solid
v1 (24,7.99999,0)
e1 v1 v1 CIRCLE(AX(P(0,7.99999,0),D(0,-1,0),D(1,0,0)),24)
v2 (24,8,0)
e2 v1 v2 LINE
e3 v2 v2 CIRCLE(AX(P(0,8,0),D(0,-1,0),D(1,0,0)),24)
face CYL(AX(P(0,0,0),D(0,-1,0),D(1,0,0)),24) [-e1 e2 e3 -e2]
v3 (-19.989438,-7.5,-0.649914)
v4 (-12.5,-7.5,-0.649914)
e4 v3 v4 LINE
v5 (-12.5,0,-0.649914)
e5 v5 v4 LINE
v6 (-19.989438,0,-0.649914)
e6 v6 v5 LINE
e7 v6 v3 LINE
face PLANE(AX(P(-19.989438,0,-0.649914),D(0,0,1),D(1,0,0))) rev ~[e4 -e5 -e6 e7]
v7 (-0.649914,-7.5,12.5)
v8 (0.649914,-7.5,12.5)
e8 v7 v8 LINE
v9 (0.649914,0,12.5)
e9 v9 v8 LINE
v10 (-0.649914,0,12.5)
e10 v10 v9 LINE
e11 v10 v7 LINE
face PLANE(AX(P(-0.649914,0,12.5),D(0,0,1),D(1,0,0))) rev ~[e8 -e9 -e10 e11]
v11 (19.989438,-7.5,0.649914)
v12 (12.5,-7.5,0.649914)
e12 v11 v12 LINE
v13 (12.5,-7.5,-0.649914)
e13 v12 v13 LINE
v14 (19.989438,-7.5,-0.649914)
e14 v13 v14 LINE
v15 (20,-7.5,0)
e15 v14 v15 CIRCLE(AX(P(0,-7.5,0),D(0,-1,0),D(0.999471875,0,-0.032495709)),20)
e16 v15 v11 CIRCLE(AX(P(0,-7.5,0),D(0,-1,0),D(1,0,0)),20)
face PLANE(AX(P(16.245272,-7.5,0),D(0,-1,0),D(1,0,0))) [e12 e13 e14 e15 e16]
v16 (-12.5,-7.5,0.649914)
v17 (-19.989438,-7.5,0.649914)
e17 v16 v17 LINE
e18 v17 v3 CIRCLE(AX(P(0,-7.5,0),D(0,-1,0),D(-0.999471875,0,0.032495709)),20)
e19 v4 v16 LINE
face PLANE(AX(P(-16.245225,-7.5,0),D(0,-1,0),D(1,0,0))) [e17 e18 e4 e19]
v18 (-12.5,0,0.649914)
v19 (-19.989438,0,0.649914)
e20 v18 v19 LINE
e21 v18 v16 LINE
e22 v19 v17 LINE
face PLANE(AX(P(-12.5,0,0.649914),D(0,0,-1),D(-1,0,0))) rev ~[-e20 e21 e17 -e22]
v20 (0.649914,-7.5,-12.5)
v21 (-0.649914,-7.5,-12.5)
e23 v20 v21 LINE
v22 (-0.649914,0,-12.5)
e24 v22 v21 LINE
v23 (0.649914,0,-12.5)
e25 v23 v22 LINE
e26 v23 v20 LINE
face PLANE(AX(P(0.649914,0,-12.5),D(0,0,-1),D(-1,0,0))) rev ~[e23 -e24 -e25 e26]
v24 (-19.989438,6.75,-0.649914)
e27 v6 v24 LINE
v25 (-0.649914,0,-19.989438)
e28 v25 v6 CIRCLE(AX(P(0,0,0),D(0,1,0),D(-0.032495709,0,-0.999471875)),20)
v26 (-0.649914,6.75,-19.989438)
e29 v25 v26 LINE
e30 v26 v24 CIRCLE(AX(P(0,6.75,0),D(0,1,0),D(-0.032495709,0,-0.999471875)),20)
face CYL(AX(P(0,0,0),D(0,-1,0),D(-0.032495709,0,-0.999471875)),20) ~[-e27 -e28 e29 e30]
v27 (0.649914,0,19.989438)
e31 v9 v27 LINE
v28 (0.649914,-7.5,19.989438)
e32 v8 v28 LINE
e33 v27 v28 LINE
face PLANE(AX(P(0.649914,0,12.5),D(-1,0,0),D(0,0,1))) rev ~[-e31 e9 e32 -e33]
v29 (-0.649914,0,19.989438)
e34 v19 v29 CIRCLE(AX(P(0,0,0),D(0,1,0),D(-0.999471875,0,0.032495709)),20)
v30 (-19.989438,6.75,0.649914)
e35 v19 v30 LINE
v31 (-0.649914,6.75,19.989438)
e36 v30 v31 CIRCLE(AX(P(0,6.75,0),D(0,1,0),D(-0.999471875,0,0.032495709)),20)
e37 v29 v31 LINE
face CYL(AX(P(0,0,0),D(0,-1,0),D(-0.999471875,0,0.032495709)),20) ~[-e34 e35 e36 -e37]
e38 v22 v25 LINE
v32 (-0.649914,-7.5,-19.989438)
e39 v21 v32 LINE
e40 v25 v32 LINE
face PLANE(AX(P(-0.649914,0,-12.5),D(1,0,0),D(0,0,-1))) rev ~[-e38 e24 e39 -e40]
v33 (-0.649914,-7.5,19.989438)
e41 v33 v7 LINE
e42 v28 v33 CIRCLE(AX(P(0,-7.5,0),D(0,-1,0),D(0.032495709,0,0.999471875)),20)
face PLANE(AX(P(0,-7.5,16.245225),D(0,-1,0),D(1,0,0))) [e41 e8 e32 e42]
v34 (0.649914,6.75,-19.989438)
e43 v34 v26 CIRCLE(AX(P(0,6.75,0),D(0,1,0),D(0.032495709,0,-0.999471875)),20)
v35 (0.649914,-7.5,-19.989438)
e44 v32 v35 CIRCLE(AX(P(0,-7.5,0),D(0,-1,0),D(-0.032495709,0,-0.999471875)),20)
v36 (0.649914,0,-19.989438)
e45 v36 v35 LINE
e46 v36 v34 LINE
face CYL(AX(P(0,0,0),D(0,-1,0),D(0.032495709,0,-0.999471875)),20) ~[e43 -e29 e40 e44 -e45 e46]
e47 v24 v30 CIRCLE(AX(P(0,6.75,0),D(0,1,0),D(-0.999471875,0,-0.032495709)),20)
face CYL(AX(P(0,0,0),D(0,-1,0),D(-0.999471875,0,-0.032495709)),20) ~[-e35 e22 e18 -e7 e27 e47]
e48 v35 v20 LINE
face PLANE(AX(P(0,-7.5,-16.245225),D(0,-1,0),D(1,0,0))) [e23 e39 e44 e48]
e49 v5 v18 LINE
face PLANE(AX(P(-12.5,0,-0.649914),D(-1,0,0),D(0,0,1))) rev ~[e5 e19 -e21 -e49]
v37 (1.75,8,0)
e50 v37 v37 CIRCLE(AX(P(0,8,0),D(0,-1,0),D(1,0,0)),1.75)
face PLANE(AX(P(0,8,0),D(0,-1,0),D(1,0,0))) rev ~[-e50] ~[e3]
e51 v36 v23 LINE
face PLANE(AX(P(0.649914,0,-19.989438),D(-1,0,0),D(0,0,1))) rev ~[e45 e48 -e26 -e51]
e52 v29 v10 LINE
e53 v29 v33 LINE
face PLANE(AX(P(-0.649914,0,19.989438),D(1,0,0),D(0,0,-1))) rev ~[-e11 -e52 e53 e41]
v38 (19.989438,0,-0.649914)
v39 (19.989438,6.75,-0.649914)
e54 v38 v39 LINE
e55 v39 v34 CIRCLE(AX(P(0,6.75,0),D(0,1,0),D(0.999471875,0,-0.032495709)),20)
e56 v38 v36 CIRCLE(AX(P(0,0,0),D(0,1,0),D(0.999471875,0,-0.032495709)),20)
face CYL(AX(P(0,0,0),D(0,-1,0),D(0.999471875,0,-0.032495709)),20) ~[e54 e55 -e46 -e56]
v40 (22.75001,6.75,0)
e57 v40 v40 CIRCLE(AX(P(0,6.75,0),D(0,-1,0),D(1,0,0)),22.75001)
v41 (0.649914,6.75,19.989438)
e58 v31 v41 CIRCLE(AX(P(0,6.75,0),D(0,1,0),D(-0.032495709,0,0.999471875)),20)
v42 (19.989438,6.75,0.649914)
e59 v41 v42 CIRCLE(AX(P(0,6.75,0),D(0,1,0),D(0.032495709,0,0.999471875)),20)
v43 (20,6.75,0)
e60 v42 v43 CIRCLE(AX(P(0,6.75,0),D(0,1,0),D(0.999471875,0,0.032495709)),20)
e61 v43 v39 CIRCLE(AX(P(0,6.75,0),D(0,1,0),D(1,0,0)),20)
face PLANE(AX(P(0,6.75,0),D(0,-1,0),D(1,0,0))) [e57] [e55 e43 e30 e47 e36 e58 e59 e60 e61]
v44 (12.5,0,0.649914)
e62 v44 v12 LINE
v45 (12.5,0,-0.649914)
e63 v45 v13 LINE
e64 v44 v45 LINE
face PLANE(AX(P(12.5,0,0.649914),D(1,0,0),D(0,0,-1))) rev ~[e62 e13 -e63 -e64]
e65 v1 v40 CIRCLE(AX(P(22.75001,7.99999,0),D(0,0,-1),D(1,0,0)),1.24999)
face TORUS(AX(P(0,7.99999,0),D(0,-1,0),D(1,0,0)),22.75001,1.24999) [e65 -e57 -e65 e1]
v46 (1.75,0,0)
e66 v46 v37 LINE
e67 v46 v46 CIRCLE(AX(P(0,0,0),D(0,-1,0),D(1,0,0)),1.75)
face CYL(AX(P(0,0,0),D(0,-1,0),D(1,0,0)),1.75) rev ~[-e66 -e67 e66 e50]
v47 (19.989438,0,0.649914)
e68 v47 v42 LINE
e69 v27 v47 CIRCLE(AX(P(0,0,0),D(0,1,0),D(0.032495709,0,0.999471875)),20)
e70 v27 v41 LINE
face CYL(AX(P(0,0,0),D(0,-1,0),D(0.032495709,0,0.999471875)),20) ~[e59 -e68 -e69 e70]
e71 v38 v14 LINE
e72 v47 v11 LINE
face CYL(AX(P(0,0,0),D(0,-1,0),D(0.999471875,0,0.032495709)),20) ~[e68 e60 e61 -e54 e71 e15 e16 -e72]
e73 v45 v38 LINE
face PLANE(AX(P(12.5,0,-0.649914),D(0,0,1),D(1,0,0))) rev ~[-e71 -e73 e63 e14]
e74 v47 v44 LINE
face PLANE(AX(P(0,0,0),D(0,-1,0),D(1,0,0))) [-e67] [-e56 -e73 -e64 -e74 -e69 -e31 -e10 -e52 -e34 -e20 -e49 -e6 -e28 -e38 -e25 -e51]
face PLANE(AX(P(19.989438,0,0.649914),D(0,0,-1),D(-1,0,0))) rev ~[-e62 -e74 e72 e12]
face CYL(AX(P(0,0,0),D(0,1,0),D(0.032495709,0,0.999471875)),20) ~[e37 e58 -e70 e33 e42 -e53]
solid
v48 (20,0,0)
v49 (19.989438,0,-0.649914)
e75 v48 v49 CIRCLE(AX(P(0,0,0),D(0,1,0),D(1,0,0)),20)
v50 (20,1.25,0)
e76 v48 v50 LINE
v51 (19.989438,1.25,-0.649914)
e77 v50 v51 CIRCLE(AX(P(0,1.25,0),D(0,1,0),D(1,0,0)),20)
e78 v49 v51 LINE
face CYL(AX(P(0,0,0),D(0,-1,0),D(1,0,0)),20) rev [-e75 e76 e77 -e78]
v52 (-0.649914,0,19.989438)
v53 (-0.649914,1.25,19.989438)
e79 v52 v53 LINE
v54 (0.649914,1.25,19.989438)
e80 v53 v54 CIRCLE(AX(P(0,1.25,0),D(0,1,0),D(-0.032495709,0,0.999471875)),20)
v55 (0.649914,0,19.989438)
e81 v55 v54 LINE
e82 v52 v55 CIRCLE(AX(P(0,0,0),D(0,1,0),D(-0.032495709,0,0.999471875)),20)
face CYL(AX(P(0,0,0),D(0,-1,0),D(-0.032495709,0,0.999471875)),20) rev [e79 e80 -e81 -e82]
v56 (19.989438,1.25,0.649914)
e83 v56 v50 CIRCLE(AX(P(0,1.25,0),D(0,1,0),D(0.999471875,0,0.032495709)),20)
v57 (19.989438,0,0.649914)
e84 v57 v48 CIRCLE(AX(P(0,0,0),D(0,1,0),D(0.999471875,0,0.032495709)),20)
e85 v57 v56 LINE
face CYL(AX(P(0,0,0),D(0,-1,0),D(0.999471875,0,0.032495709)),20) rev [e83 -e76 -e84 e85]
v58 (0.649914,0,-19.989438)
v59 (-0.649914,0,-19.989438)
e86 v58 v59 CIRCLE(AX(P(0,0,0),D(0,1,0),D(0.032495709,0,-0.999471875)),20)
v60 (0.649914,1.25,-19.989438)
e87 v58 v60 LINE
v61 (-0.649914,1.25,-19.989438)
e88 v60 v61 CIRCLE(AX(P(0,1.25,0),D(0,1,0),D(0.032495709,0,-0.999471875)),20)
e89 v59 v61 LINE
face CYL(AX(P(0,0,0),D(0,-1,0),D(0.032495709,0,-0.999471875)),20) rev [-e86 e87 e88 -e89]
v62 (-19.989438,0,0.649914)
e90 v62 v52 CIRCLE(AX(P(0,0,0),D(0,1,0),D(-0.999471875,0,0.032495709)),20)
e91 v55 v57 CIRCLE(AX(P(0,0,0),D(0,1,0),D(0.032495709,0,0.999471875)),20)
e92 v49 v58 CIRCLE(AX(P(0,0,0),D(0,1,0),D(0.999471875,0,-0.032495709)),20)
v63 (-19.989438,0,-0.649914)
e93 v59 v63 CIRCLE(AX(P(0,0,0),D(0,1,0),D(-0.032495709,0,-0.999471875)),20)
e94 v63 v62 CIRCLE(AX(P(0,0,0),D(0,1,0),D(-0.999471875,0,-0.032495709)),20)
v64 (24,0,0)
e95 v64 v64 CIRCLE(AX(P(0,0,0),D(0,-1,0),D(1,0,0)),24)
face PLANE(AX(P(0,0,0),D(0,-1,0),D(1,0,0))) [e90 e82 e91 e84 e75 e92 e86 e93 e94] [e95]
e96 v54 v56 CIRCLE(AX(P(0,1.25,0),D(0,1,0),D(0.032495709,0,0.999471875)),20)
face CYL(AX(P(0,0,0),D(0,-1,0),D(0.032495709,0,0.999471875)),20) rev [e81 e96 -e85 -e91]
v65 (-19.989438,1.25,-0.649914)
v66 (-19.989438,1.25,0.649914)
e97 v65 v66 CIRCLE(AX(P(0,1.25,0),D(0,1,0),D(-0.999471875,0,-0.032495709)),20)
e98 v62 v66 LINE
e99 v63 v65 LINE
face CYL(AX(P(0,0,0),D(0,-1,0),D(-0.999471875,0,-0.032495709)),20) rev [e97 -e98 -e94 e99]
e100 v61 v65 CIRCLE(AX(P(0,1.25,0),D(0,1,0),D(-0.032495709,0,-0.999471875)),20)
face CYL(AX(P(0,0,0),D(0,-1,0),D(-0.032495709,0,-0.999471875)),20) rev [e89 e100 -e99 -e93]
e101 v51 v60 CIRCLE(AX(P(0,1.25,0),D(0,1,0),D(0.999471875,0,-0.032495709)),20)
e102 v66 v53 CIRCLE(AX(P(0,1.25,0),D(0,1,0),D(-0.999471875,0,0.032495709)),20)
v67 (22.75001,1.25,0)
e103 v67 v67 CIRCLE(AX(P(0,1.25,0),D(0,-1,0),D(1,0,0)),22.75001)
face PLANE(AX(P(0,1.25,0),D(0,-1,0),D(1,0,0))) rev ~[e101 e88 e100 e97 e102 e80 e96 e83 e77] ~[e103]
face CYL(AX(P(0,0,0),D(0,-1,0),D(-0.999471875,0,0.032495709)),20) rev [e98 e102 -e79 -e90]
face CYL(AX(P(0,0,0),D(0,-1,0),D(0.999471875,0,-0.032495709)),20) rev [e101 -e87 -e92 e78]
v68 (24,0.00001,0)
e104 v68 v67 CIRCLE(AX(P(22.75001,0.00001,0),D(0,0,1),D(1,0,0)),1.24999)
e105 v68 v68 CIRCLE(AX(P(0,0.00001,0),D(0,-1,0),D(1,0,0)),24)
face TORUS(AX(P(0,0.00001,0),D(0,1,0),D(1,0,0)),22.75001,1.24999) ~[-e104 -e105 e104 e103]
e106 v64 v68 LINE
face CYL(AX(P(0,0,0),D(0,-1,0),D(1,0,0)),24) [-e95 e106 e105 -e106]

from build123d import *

# Parameters (mm, degrees)
F0_R     = 24
F0_R_2   = 1.75
F1_DEPTH = 8
F2_DEPTH = 6.75
F3_DEPTH = 1.25
F4_R     = 1.24999
F4_2_R   = 1.24999
F5_DEPTH = 7.5


# Not quite as in the source:
# - a fillet or chamfer is up to 0.001 mm smaller than in the source, because OpenCascade refuses the exact size
# - after a boolean that leaves OpenCascade's solid faulty, fix() repairs it


with BuildPart() as f1:
    # F0 (on Front) → F1 (new body)
    with BuildSketch(Plane.XZ):
        Circle(F0_R)
        with BuildLine():
            ThreePointArc((19.9894375, 0.649914174), (19.9973592007, 0.325), (20, 0))
            ThreePointArc((20, 0), (19.9973592007, -0.325), (19.9894375, -0.649914174))
            ThreePointArc((19.9894375, -0.649914174), (14.1421356237, -14.1421356237), (0.649914174, -19.9894375))
            ThreePointArc((0.649914174, -19.9894375), (0, -20), (-0.649914174, -19.9894375))
            ThreePointArc((-0.649914174, -19.9894375), (-14.1421356237, -14.1421356237), (-19.9894375, -0.649914174))
            ThreePointArc((-19.9894375, -0.649914174), (-20, 0), (-19.9894375, 0.649914174))
            ThreePointArc((-19.9894375, 0.649914174), (-14.1421356237, 14.1421356237), (-0.649914174, 19.9894375))
            ThreePointArc((-0.649914174, 19.9894375), (0, 20), (0.649914174, 19.9894375))
            ThreePointArc((0.649914174, 19.9894375), (14.1421356237, 14.1421356237), (19.9894375, 0.649914174))
        make_face(mode=Mode.SUBTRACT)
        with BuildLine():
            Line((12.5, 0.649914174), (19.9894375, 0.649914174))
            ThreePointArc((19.9894375, 0.649914174), (14.1421356237, 14.1421356237), (0.649914174, 19.9894375))
            Line((0.649914174, 19.9894375), (0.649914174, 12.5))
            Line((0.649914174, 12.5), (-0.649914174, 12.5))
            Line((-0.649914174, 12.5), (-0.649914174, 19.9894375))
            ThreePointArc((-0.649914174, 19.9894375), (-14.1421356237, 14.1421356237), (-19.9894375, 0.649914174))
            Line((-19.9894375, 0.649914174), (-12.5, 0.649914174))
            Line((-12.5, 0.649914174), (-12.5, -0.649914174))
            Line((-12.5, -0.649914174), (-19.9894375, -0.649914174))
            ThreePointArc((-19.9894375, -0.649914174), (-14.1421356237, -14.1421356237), (-0.649914174, -19.9894375))
            Line((-0.649914174, -19.9894375), (-0.649914174, -12.5))
            Line((-0.649914174, -12.5), (0.649914174, -12.5))
            Line((0.649914174, -12.5), (0.649914174, -19.9894375))
            ThreePointArc((0.649914174, -19.9894375), (14.1421356237, -14.1421356237), (19.9894375, -0.649914174))
            Line((19.9894375, -0.649914174), (12.5, -0.649914174))
            Line((12.5, -0.649914174), (12.5, 0.649914174))
        make_face()
        Circle(F0_R_2, mode=Mode.SUBTRACT)
        with BuildLine():
            Line((0.649914174, 12.5), (0.649914174, 19.9894375))
            ThreePointArc((0.649914174, 19.9894375), (0, 20), (-0.649914174, 19.9894375))
            Line((-0.649914174, 19.9894375), (-0.649914174, 12.5))
            Line((-0.649914174, 12.5), (0.649914174, 12.5))
        make_face()
        with BuildLine():
            ThreePointArc((19.9894375, -0.649914174), (19.9973592007, -0.325), (20, 0))
            ThreePointArc((20, 0), (19.9973592007, 0.325), (19.9894375, 0.649914174))
            Line((19.9894375, 0.649914174), (12.5, 0.649914174))
            Line((12.5, 0.649914174), (12.5, -0.649914174))
            Line((12.5, -0.649914174), (19.9894375, -0.649914174))
        make_face()
        with BuildLine():
            Line((-12.5, 0.649914174), (-19.9894375, 0.649914174))
            ThreePointArc((-19.9894375, 0.649914174), (-20, 0), (-19.9894375, -0.649914174))
            Line((-19.9894375, -0.649914174), (-12.5, -0.649914174))
            Line((-12.5, -0.649914174), (-12.5, 0.649914174))
        make_face()
        with BuildLine():
            ThreePointArc((-0.649914174, -19.9894375), (0, -20), (0.649914174, -19.9894375))
            Line((0.649914174, -19.9894375), (0.649914174, -12.5))
            Line((0.649914174, -12.5), (-0.649914174, -12.5))
            Line((-0.649914174, -12.5), (-0.649914174, -19.9894375))
        make_face()
    extrude(amount=-F1_DEPTH)

    # F0 (on Front) → F2 (cut)
    with BuildSketch(Plane.XZ):
        Circle(F0_R)
        with BuildLine():
            ThreePointArc((19.9894375, 0.649914174), (19.9973592007, 0.325), (20, 0))
            ThreePointArc((20, 0), (19.9973592007, -0.325), (19.9894375, -0.649914174))
            ThreePointArc((19.9894375, -0.649914174), (14.1421356237, -14.1421356237), (0.649914174, -19.9894375))
            ThreePointArc((0.649914174, -19.9894375), (0, -20), (-0.649914174, -19.9894375))
            ThreePointArc((-0.649914174, -19.9894375), (-14.1421356237, -14.1421356237), (-19.9894375, -0.649914174))
            ThreePointArc((-19.9894375, -0.649914174), (-20, 0), (-19.9894375, 0.649914174))
            ThreePointArc((-19.9894375, 0.649914174), (-14.1421356237, 14.1421356237), (-0.649914174, 19.9894375))
            ThreePointArc((-0.649914174, 19.9894375), (0, 20), (0.649914174, 19.9894375))
            ThreePointArc((0.649914174, 19.9894375), (14.1421356237, 14.1421356237), (19.9894375, 0.649914174))
        make_face(mode=Mode.SUBTRACT)
    extrude(amount=-F2_DEPTH, mode=Mode.SUBTRACT)

    # F4 (radius 1.25 in the source; OpenCascade refuses exactly that, so slightly less here)
    f4_edges = [f1.edges().sort_by_distance(p)[0] for p in [
        (-24, 6.75, 0),
    ]]
    fillet(f4_edges, radius=F4_R)

    # F0 (on Front) → F5 (join)
    with BuildSketch(Plane.XZ):
        with BuildLine():
            Line((0.649914174, 12.5), (0.649914174, 19.9894375))
            ThreePointArc((0.649914174, 19.9894375), (0, 20), (-0.649914174, 19.9894375))
            Line((-0.649914174, 19.9894375), (-0.649914174, 12.5))
            Line((-0.649914174, 12.5), (0.649914174, 12.5))
        make_face()
        with BuildLine():
            Line((-12.5, 0.649914174), (-19.9894375, 0.649914174))
            ThreePointArc((-19.9894375, 0.649914174), (-20, 0), (-19.9894375, -0.649914174))
            Line((-19.9894375, -0.649914174), (-12.5, -0.649914174))
            Line((-12.5, -0.649914174), (-12.5, 0.649914174))
        make_face()
        with BuildLine():
            ThreePointArc((19.9894375, -0.649914174), (19.9973592007, -0.325), (20, 0))
            ThreePointArc((20, 0), (19.9973592007, 0.325), (19.9894375, 0.649914174))
            Line((19.9894375, 0.649914174), (12.5, 0.649914174))
            Line((12.5, 0.649914174), (12.5, -0.649914174))
            Line((12.5, -0.649914174), (19.9894375, -0.649914174))
        make_face()
        with BuildLine():
            ThreePointArc((-0.649914174, -19.9894375), (0, -20), (0.649914174, -19.9894375))
            Line((0.649914174, -19.9894375), (0.649914174, -12.5))
            Line((0.649914174, -12.5), (-0.649914174, -12.5))
            Line((-0.649914174, -12.5), (-0.649914174, -19.9894375))
        make_face()
    extrude(amount=F5_DEPTH)

    add(f1.part.fix(), mode=Mode.REPLACE)


with BuildPart() as f3:
    # F0 (on Front) → F3 (new body)
    with BuildSketch(Plane.XZ):
        Circle(F0_R)
        with BuildLine():
            ThreePointArc((19.9894375, 0.649914174), (19.9973592007, 0.325), (20, 0))
            ThreePointArc((20, 0), (19.9973592007, -0.325), (19.9894375, -0.649914174))
            ThreePointArc((19.9894375, -0.649914174), (14.1421356237, -14.1421356237), (0.649914174, -19.9894375))
            ThreePointArc((0.649914174, -19.9894375), (0, -20), (-0.649914174, -19.9894375))
            ThreePointArc((-0.649914174, -19.9894375), (-14.1421356237, -14.1421356237), (-19.9894375, -0.649914174))
            ThreePointArc((-19.9894375, -0.649914174), (-20, 0), (-19.9894375, 0.649914174))
            ThreePointArc((-19.9894375, 0.649914174), (-14.1421356237, 14.1421356237), (-0.649914174, 19.9894375))
            ThreePointArc((-0.649914174, 19.9894375), (0, 20), (0.649914174, 19.9894375))
            ThreePointArc((0.649914174, 19.9894375), (14.1421356237, 14.1421356237), (19.9894375, 0.649914174))
        make_face(mode=Mode.SUBTRACT)
    extrude(amount=-F3_DEPTH)

    # F4#2 (radius 1.25 in the source; OpenCascade refuses exactly that, so slightly less here)
    f4_2_edges = [f3.edges().sort_by_distance(p)[0] for p in [
        (-24, 1.25, 0),
    ]]
    fillet(f4_2_edges, radius=F4_2_R)


solid = Compound([f1.part, f3.part])
